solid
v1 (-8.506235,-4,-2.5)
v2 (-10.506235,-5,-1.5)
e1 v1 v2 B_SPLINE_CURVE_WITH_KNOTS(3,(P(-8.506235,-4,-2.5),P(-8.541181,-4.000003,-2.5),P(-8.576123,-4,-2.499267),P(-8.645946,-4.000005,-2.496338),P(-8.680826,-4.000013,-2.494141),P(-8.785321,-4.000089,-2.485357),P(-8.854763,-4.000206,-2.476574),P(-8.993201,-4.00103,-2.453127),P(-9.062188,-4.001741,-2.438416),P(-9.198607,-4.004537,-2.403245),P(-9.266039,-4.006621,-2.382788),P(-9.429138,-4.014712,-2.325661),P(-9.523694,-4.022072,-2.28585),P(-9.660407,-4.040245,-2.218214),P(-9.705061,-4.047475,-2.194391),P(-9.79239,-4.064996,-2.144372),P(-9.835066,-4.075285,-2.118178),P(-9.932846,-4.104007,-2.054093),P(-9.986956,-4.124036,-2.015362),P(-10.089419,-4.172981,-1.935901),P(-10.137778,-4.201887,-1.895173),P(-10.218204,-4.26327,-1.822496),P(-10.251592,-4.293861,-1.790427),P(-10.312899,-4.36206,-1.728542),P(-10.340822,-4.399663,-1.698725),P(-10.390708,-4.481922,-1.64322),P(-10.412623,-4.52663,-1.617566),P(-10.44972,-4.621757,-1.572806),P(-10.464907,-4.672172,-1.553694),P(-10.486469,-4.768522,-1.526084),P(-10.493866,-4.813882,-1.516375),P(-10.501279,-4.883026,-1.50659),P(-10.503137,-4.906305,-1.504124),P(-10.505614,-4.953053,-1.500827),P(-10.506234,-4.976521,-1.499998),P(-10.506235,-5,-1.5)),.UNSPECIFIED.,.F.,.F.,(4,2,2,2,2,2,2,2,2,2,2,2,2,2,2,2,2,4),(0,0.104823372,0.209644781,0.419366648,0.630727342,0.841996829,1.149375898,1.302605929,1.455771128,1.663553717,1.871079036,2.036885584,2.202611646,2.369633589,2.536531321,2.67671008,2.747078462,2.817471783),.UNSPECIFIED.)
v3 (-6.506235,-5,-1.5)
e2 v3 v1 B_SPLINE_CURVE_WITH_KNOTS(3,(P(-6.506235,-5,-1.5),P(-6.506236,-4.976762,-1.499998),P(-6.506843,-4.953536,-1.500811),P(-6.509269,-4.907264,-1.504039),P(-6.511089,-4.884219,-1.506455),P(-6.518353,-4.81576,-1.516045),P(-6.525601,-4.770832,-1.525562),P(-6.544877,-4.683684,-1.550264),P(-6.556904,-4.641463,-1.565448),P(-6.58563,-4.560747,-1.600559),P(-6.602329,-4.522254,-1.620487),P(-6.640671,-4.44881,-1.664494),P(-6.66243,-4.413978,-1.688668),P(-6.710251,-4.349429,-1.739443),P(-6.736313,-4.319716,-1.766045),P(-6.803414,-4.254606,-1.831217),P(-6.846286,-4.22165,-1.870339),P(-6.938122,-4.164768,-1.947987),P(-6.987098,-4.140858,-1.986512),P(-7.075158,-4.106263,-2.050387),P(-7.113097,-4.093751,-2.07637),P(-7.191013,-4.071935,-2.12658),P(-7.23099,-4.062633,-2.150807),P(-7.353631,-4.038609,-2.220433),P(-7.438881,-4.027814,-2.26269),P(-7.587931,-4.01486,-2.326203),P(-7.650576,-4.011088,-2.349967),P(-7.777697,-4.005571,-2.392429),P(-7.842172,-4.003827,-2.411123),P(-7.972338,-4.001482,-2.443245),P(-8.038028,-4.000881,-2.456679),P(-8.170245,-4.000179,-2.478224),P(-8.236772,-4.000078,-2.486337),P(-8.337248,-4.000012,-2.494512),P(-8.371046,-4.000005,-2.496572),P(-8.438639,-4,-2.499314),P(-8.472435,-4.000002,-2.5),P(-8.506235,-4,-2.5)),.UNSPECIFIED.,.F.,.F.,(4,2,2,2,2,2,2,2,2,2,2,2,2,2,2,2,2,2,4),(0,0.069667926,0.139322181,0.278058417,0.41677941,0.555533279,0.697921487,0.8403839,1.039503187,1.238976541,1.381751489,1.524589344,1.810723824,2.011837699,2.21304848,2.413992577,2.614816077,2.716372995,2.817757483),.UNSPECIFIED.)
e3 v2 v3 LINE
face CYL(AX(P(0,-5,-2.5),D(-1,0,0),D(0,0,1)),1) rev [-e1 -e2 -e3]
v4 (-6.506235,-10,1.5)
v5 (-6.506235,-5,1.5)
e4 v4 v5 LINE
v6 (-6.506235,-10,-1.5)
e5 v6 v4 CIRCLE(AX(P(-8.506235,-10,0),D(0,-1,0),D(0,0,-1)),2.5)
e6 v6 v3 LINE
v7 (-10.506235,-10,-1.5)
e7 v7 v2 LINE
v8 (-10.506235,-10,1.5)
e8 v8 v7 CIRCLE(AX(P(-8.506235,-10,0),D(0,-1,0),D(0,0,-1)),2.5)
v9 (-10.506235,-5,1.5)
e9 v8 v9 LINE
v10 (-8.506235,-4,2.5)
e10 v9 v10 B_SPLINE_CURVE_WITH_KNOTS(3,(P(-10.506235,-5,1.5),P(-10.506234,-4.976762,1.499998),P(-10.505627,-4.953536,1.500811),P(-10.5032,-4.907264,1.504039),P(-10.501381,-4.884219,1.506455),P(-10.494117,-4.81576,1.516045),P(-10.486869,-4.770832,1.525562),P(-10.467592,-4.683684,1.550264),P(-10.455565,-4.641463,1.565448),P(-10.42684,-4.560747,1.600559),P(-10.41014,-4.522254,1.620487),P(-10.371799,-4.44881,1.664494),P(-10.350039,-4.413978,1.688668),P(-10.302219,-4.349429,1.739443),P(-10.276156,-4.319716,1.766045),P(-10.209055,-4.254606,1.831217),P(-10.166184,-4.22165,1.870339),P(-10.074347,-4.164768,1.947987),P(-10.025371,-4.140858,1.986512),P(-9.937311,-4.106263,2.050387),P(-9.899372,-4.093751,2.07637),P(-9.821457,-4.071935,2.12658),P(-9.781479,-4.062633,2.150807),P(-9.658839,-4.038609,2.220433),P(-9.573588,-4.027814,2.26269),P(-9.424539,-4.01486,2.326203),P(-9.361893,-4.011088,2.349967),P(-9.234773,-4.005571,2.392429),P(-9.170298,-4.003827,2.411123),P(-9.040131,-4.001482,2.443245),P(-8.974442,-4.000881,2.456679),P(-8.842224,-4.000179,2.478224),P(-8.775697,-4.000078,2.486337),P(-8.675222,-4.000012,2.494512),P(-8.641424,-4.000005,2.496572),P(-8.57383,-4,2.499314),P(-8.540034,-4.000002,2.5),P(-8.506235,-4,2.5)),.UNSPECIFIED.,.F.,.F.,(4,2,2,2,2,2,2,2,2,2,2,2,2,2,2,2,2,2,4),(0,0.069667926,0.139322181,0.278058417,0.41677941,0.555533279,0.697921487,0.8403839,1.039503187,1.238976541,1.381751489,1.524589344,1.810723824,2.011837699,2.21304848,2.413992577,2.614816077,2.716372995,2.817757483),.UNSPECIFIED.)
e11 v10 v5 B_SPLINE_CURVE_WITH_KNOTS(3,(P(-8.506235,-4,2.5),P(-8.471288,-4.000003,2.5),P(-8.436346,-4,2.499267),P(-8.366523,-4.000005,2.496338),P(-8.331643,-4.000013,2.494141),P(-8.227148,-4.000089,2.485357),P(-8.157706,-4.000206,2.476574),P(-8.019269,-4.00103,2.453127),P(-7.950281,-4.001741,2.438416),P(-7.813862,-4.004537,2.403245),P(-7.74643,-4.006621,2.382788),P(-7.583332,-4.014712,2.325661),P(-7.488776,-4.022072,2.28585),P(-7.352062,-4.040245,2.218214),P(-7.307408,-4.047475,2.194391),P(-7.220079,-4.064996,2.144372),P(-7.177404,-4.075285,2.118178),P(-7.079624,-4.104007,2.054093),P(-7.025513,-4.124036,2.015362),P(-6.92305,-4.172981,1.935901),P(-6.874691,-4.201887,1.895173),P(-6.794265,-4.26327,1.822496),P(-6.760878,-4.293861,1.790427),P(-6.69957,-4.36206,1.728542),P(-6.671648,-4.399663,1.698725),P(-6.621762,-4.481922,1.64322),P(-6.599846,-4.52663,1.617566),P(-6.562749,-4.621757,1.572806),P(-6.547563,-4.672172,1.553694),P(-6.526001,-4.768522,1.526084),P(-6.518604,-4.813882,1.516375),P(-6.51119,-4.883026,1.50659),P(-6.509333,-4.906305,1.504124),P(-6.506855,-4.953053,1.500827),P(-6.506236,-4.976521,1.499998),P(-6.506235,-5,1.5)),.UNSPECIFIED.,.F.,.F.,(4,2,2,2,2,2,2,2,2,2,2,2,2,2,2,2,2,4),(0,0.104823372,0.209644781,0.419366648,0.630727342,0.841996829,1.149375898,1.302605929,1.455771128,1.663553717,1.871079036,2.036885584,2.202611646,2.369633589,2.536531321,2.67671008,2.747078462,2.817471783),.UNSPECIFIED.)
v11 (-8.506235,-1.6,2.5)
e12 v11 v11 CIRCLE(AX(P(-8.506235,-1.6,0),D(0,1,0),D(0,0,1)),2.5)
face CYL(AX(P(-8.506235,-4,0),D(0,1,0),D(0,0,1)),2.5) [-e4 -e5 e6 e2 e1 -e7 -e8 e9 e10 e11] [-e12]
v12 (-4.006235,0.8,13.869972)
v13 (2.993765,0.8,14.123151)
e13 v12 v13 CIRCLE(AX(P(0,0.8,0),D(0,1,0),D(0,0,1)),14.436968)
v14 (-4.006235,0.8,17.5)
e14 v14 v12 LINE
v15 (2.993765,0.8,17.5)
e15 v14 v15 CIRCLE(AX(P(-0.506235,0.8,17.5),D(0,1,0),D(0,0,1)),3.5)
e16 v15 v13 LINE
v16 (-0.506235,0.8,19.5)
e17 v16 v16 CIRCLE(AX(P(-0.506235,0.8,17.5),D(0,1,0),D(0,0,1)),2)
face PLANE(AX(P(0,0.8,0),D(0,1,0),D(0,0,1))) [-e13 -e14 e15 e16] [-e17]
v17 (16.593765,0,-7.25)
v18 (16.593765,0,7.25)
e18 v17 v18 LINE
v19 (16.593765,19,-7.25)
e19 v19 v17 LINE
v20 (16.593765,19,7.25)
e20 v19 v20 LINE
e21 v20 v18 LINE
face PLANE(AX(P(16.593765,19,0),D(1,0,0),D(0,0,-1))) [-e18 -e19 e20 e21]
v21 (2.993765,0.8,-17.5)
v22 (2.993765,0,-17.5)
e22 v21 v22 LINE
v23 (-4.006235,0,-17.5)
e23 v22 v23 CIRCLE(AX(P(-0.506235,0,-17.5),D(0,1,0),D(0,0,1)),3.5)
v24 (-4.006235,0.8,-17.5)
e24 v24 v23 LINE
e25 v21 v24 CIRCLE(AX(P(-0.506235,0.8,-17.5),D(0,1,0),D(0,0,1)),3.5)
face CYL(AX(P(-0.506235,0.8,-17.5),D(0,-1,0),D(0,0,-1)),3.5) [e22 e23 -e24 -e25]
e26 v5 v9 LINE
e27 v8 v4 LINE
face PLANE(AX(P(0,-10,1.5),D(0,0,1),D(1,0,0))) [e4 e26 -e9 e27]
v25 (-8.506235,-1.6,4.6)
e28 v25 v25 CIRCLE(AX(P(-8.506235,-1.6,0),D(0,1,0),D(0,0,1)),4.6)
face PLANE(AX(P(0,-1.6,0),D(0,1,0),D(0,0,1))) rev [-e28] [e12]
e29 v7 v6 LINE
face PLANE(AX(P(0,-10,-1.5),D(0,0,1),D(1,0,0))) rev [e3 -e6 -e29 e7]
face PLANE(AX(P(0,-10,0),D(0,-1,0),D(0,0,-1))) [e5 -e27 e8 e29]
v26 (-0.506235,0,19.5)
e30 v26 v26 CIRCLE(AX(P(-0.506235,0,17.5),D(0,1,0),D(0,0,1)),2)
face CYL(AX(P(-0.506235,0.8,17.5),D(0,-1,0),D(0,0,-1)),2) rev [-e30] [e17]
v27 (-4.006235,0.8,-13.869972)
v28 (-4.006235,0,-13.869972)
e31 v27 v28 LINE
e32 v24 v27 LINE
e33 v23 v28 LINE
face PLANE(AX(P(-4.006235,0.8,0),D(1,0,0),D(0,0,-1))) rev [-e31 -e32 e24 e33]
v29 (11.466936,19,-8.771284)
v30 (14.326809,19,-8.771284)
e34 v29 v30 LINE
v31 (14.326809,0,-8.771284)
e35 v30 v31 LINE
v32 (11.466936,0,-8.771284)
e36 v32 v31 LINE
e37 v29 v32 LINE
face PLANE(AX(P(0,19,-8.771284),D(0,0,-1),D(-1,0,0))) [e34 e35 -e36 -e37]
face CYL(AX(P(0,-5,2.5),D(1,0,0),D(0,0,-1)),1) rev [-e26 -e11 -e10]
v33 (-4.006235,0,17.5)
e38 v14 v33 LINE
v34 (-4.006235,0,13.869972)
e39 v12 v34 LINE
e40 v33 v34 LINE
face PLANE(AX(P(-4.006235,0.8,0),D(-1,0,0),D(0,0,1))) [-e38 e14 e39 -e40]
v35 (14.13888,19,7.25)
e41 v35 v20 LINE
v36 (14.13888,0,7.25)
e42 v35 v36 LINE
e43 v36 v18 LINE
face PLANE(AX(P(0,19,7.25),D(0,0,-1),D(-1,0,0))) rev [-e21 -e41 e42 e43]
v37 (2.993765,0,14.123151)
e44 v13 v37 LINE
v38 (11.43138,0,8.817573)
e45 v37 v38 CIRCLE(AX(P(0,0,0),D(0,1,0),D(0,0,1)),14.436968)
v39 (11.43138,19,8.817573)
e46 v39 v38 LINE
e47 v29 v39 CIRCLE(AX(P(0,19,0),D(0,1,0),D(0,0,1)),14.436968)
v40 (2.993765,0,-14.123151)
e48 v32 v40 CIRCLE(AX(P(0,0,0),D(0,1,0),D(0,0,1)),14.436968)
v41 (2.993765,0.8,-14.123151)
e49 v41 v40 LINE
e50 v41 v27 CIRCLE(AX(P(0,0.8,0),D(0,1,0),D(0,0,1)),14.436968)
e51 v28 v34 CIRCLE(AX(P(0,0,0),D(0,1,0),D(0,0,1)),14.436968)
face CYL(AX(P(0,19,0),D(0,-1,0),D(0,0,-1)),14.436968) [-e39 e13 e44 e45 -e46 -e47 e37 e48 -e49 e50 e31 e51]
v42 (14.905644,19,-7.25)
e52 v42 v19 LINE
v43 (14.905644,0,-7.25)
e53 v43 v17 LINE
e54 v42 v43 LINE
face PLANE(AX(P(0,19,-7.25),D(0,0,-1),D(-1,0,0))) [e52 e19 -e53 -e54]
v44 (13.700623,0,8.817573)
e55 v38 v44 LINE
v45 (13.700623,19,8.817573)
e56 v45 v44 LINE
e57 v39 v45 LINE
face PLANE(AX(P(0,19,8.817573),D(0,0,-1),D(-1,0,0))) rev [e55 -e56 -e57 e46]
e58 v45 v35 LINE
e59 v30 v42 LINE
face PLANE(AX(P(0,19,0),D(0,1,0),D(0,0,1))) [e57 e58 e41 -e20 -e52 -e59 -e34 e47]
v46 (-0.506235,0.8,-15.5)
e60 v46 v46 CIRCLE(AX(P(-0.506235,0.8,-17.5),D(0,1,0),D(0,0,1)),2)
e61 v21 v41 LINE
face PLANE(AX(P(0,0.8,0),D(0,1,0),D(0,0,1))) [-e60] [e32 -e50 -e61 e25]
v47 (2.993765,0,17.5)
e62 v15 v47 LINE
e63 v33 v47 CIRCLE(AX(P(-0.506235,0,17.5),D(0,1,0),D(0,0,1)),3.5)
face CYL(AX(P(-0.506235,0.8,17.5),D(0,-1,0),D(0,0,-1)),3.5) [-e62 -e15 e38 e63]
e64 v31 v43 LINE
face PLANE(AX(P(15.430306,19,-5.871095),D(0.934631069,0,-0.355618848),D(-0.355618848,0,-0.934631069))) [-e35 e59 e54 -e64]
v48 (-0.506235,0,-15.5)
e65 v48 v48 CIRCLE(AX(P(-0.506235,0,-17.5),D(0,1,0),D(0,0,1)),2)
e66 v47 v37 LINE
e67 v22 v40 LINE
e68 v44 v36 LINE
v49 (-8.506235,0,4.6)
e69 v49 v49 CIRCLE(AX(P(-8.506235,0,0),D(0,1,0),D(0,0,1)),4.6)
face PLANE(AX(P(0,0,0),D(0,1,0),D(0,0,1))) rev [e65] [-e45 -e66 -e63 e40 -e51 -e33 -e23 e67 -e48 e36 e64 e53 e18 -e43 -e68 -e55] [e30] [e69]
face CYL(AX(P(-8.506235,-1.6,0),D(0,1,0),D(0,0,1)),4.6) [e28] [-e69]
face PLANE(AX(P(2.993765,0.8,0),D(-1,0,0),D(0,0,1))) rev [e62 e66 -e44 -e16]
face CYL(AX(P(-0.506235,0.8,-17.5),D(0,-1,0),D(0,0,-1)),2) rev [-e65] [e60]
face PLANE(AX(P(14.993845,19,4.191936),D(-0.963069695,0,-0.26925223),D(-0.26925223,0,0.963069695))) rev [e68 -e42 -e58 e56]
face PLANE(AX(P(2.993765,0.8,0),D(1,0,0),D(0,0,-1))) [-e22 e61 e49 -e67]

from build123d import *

# Parameters (mm, degrees)
SKETCH1_R           = 4.6
SKETCH1_R_2         = 2.5
BOSS_EXTRUDE1_DEPTH = 19
SKETCH1_3_R         = 4.6
SKETCH1_3_R_2       = 2.5
SKETCH1_3_R_3       = 2
BOSS_EXTRUDE2_DEPTH = 1.6
SKETCH1_4_R         = 2
BOSS_EXTRUDE3_DEPTH = 0.8
SKETCH1_5_R         = 2.5
BOSS_EXTRUDE4_DEPTH = 4
BOSS_EXTRUDE5_DEPTH = 6
FILLET1_R           = 1
FILLET2_R           = 1


with BuildPart() as part:
    # Sketch1 → Boss-Extrude1 (new body)
    # profile 1 of 3: a face of its own
    with BuildSketch(Plane(origin=(0, 0, 0), x_dir=(1, 0, 0), z_dir=(0, 1, 0))):
        with BuildLine():
            ThreePointArc((11.466935703, 8.771283954), (-14.436938211, 0.029184365), (11.431379714, -8.817573048))
            Line((11.431379714, -8.817573048), (13.700622891, -8.817573048))
            Line((13.700622891, -8.817573048), (14.138880413, -7.25))
            Line((14.138880413, -7.25), (16.593765248, -7.25))
            Line((16.593765248, -7.25), (16.593765248, 7.25))
            Line((16.593765248, 7.25), (14.905644331, 7.25))
            Line((14.905644331, 7.25), (14.326809253, 8.771283954))
            Line((14.326809253, 8.771283954), (11.466935703, 8.771283954))
        make_face()
        with Locations((-8.506234752, 0)):
            Circle(SKETCH1_R, mode=Mode.SUBTRACT)
    # profile 2 of 3: a face of its own
    with BuildSketch(Plane(origin=(0, 0, 0), x_dir=(1, 0, 0), z_dir=(0, 1, 0))):
        with Locations((-8.506234752, 0)):
            Circle(SKETCH1_R)
        with Locations((-8.506234752, 0)):
            Circle(SKETCH1_R_2, mode=Mode.SUBTRACT)
    # profile 3 of 3: a face of its own
    with BuildSketch(Plane(origin=(0, 0, 0), x_dir=(1, 0, 0), z_dir=(0, 1, 0))):
        with Locations((-8.506234752, 0)):
            Circle(SKETCH1_R_2)
    extrude(amount=BOSS_EXTRUDE1_DEPTH)

    # Sketch1<3> → Boss-Extrude2 (add)
    # profile 1 of 2: a face of its own
    with BuildSketch(Plane(origin=(0, 0, 0), x_dir=(1, 0, 0), z_dir=(0, 1, 0))):
        with Locations(Location((-8.506234752, 0, 0), (0, 0, 270))):
            Circle(SKETCH1_3_R)
        with Locations(Location((-8.506234752, 0, 0), (0, 0, 270))):
            Circle(SKETCH1_3_R_2, mode=Mode.SUBTRACT)
    # profile 2 of 2: a face of its own
    with BuildSketch(Plane(origin=(0, 0, 0), x_dir=(1, 0, 0), z_dir=(0, 1, 0))):
        with Locations((-0.506234752, 17.5)):
            Circle(SKETCH1_3_R_3)
    extrude(amount=-BOSS_EXTRUDE2_DEPTH)


with BuildPart() as boss_extrude2_kept_piece:
    # of the separate pieces the step leaves, the one the design keeps (boss_extrude2_pieces_kept)
    add(part.part.solids().sort_by_distance((11.466935703, 0, -8.771283954))[0])

    # Sketch1<4> → Boss-Extrude3 (add)
    # profile 1 of 2: a face of its own
    with BuildSketch(Plane(origin=(0, 0, 0), x_dir=(1, 0, 0), z_dir=(0, 1, 0))):
        with BuildLine():
            ThreePointArc((-4.006234752, 13.869971872), (-0.52182238, 14.427534025), (2.993765248, 14.123151428))
            Line((2.993765248, 14.123151428), (2.993765248, 17.5))
            ThreePointArc((2.993765248, 17.5), (-0.506234752, 21), (-4.006234752, 17.5))
            Line((-4.006234752, 17.5), (-4.006234752, 13.869971872))
        make_face()
        with Locations(Location((-0.506234752, 17.5, 0), (0, 0, 270))):
            Circle(SKETCH1_4_R, mode=Mode.SUBTRACT)
    # profile 2 of 2: a face of its own
    with BuildSketch(Plane(origin=(0, 0, 0), x_dir=(1, 0, 0), z_dir=(0, 1, 0))):
        with BuildLine():
            ThreePointArc((2.993765248, -14.123151428), (-0.52182238, -14.427534025), (-4.006234752, -13.869971872))
            Line((-4.006234752, -13.869971872), (-4.006234752, -17.5))
            ThreePointArc((-4.006234752, -17.5), (-0.506234752, -21), (2.993765248, -17.5))
            Line((2.993765248, -17.5), (2.993765248, -14.123151428))
        make_face()
        with Locations(Location((-0.506234752, -17.5, 0), (0, 0, 270))):
            Circle(SKETCH1_4_R, mode=Mode.SUBTRACT)
    extrude(amount=BOSS_EXTRUDE3_DEPTH)

    # Sketch1<5> → Boss-Extrude4 (add)
    with BuildSketch(Plane(origin=(0, 0, 0), x_dir=(1, 0, 0), z_dir=(0, 1, 0))):
        with Locations(Location((-8.506234752, 0, 0), (0, 0, 270))):
            Circle(SKETCH1_5_R)
    extrude(amount=-BOSS_EXTRUDE4_DEPTH)

    # Sketch5 → Boss-Extrude5 (add)
    with BuildSketch(Plane.XZ.offset(4)):
        with BuildLine():
            Line((-9.968251002, 1.5), (-10.506234752, 1.5))
            ThreePointArc((-10.506234752, 1.5), (-11.006234752, 0), (-10.506234752, -1.5))
            Line((-10.506234752, -1.5), (-9.968251002, -1.5))
            Line((-9.968251002, -1.5), (-9.968251002, 1.5))
        make_face()
        with BuildLine():
            Line((-6.506234752, 1.5), (-9.968251002, 1.5))
            Line((-9.968251002, 1.5), (-9.968251002, -1.5))
            Line((-9.968251002, -1.5), (-6.506234752, -1.5))
            ThreePointArc((-6.506234752, -1.5), (-6.134526507, -0.790569415), (-6.006234752, 0))
            ThreePointArc((-6.006234752, 0), (-6.134526507, 0.790569415), (-6.506234752, 1.5))
        make_face()
    extrude(amount=BOSS_EXTRUDE5_DEPTH)

    # Fillet1
    # the kernel refuses this fillet: 1 mm, written as the material it adds along each edge
    with BuildSketch(Plane(origin=(-4.006234752, -4, 1.5), x_dir=(0, 0, 1), z_dir=(-1, 0, 0))) as fillet1_piece_1_section:
        with BuildLine():
            CenterArc((FILLET1_R, -FILLET1_R), FILLET1_R, 90, 90)
            Line((0, -FILLET1_R), (0, 0))
            Line((0, 0), (FILLET1_R, 0))
        make_face()
    fillet1_piece_1 = extrude(amount=9, mode=Mode.PRIVATE)
    fillet1_piece_1 = fillet1_piece_1 & Plane(origin=(-8.506234752, -4.243408623, 0), x_dir=(0, 0, 1), z_dir=(0, 1, 0)) * Cylinder(2.5, 22, mode=Mode.PRIVATE)
    add(fillet1_piece_1)

    # Fillet2
    # the kernel refuses this fillet: 1 mm, written as the material it adds along each edge
    with BuildSketch(Plane(origin=(-13.006234752, -4, -1.5), x_dir=(0, 0, -1), z_dir=(1, 0, 0))) as fillet2_piece_1_section:
        with BuildLine():
            CenterArc((FILLET2_R, -FILLET2_R), FILLET2_R, 90, 90)
            Line((0, -FILLET2_R), (0, 0))
            Line((0, 0), (FILLET2_R, 0))
        make_face()
    fillet2_piece_1 = extrude(amount=9, mode=Mode.PRIVATE)
    fillet2_piece_1 = fillet2_piece_1 & Plane(origin=(-8.506234752, -4.243408623, 0), x_dir=(0, 0, 1), z_dir=(0, 1, 0)) * Cylinder(2.5, 22, mode=Mode.PRIVATE)
    add(fillet2_piece_1)


solid = boss_extrude2_kept_piece.part
